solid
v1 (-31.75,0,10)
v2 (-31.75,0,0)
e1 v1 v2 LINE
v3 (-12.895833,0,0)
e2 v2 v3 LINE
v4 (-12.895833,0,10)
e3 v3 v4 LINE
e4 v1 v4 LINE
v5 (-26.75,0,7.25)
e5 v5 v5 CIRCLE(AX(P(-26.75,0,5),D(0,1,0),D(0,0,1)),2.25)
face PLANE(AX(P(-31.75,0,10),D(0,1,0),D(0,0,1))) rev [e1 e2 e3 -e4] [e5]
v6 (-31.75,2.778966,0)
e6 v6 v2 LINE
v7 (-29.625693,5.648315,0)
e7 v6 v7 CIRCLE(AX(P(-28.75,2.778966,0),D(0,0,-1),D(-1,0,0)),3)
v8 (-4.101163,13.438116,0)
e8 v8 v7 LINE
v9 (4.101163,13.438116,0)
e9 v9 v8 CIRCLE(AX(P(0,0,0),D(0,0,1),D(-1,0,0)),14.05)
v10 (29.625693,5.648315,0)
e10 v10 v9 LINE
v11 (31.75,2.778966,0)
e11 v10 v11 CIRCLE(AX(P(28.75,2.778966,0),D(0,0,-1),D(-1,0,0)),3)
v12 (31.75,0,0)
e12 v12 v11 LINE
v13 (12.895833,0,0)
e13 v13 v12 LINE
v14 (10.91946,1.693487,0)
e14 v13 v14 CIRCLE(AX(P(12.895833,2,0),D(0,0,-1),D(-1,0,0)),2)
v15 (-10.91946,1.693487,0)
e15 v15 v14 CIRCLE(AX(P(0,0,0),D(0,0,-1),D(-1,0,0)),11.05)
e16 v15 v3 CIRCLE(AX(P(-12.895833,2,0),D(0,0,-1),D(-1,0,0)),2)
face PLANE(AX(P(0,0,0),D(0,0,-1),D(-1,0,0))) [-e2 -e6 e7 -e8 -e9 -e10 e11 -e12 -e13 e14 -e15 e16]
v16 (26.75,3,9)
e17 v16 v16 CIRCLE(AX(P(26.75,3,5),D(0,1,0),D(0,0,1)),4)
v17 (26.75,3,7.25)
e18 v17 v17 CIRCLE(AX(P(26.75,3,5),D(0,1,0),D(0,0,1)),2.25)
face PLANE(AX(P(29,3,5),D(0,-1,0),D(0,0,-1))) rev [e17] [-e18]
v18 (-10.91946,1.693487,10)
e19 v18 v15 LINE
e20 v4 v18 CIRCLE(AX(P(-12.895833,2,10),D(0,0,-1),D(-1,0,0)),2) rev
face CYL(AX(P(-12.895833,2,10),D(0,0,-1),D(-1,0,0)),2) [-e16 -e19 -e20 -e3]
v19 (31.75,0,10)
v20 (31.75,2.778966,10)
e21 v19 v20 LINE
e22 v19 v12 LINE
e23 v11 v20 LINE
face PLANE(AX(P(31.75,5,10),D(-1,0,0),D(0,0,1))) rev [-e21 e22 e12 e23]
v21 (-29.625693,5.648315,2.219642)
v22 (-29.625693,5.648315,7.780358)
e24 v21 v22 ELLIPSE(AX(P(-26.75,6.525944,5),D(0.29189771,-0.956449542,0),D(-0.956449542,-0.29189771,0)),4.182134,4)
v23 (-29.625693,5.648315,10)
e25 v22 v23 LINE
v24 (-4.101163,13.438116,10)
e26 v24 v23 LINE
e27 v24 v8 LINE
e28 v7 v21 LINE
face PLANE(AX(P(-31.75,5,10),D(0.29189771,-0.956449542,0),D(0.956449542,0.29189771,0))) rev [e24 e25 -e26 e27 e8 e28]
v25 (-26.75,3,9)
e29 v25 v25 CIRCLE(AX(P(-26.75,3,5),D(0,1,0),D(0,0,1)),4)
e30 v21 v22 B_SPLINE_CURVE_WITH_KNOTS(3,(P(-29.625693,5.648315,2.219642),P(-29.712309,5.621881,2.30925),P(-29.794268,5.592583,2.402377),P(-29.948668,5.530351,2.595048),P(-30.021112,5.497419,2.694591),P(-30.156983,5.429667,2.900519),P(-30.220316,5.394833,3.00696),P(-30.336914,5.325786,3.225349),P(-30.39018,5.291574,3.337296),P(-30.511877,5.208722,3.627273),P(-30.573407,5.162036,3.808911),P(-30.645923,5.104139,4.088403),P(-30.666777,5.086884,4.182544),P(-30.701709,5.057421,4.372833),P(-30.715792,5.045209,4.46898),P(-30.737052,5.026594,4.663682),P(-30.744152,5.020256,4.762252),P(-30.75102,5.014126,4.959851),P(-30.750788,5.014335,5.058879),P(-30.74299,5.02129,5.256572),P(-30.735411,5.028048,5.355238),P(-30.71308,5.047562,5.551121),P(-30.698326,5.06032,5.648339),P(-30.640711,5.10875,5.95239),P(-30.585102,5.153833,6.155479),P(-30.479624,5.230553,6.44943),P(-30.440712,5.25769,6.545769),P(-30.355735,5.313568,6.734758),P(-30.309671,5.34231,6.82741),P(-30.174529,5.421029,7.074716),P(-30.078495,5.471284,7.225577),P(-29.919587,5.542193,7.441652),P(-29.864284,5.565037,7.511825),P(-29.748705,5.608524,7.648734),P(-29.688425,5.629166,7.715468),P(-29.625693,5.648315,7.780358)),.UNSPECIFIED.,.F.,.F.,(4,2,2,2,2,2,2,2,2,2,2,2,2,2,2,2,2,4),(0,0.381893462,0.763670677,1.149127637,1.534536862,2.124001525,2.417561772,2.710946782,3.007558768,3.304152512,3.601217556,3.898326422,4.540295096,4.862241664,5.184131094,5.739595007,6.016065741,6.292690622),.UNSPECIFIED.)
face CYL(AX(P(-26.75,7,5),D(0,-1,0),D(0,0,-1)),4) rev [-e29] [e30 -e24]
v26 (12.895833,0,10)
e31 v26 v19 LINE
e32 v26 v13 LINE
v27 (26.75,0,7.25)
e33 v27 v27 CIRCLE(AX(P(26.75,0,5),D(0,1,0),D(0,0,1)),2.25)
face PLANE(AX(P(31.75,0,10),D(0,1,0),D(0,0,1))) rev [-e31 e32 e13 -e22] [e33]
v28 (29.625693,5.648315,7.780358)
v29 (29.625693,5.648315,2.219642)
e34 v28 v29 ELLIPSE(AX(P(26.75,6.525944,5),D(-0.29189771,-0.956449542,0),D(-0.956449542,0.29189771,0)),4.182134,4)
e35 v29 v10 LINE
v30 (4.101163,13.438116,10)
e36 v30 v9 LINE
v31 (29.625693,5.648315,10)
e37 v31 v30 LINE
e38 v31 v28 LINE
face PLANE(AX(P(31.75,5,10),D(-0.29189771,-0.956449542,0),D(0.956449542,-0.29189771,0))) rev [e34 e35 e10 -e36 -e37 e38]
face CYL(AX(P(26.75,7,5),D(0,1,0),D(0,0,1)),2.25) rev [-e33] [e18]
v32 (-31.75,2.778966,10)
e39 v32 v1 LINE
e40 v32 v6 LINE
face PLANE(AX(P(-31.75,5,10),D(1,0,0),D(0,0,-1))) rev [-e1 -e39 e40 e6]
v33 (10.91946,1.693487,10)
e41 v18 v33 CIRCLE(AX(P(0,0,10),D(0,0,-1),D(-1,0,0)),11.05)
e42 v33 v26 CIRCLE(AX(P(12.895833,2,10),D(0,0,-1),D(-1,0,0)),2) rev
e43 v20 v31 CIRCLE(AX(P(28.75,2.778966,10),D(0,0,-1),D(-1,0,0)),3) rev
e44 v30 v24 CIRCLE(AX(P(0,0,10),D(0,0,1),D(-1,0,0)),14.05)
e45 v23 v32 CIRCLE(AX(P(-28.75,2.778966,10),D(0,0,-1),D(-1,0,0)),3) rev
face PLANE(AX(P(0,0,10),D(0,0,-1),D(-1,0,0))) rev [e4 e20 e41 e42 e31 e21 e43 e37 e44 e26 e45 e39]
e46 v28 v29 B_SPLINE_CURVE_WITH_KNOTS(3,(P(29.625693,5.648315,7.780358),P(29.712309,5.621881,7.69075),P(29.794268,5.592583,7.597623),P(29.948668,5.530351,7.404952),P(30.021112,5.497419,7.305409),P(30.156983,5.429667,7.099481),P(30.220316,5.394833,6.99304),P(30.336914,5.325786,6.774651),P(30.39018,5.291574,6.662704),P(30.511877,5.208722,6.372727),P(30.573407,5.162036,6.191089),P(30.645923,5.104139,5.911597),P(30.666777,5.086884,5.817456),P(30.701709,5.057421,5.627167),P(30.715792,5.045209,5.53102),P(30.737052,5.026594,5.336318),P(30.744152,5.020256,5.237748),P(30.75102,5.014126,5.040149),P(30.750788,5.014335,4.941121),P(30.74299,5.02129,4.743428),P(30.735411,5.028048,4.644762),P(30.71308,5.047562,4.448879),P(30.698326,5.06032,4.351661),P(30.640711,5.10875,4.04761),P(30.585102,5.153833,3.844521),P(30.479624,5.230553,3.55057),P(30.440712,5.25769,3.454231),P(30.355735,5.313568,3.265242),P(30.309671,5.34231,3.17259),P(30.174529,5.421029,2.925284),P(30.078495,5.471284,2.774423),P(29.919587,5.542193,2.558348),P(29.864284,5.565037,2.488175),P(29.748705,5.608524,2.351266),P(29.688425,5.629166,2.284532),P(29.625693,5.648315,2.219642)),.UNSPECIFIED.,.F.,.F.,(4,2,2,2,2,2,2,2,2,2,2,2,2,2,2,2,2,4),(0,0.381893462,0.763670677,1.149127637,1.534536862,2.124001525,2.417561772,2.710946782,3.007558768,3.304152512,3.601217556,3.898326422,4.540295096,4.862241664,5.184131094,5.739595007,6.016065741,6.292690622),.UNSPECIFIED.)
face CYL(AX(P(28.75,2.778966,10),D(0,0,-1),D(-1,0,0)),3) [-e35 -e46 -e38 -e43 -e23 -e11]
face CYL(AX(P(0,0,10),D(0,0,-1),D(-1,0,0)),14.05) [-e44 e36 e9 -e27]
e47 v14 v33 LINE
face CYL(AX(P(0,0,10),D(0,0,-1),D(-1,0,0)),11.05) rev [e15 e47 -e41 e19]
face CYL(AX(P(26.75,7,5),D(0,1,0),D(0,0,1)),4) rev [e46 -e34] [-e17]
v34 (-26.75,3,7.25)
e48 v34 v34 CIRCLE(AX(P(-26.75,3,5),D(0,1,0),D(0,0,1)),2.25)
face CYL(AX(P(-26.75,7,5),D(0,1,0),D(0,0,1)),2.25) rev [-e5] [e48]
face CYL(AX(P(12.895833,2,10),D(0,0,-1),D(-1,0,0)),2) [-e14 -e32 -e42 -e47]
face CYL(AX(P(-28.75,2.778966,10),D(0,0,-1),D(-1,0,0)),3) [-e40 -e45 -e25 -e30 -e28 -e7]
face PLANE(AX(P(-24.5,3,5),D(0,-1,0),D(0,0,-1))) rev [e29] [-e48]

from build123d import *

# Parameters (mm, degrees)
EXTRUDE_1_DEPTH             = 10
HOLE_WIZARD_M43_D           = 4.5
HOLE_WIZARD_M43_CBORE_D     = 8
HOLE_WIZARD_M43_CBORE_DEPTH = 4
FILLET_4_R                  = 2
FILLET_2_R                  = 3


with BuildPart() as part:
    # Эскиз1 → Бобышка-Вытянуть1 (new body)
    with BuildSketch(Plane.XY):
        with BuildLine():
            Line((-31.75, 5), (-4.101162824, 13.438116069))
            ThreePointArc((-4.101162824, 13.438116069), (0, 14.05), (4.101162824, 13.438116069))
            Line((4.101162824, 13.438116069), (31.75, 5))
            Line((31.75, 5), (31.75, 0))
            Line((31.75, 0), (11.05, 0))
            ThreePointArc((11.05, 0), (0, 11.05), (-11.05, 0))
            Line((-11.05, 0), (-31.75, 0))
            Line((-31.75, 0), (-31.75, 5))
        make_face()
    extrude(amount=EXTRUDE_1_DEPTH)

    # Эскиз5 → Цековка для винта с внутренним шестигранником M42 (revolve, cut)
    with BuildSketch(Plane(origin=(-26.75, 7, 5), x_dir=(0, 0, -1), z_dir=(1, 0, 0))):
        Polygon((0, 0), (0, 7.05), (2.25, 7.05), (2.25, 4), (4, 4), (4, 0), align=None)
    revolve(axis=Axis((-26.75, 0.65, 5), (0, 1, 0)), mode=Mode.SUBTRACT)

    # Цековка для винта с внутренним шестигранником M43 (through all)
    with Locations(Plane(origin=(0, 7, 0), x_dir=(1, 0, 0), z_dir=(0, 1, 0))):
        with Locations((-26.75, -5)):
            CounterBoreHole(HOLE_WIZARD_M43_D / 2, HOLE_WIZARD_M43_CBORE_D / 2, HOLE_WIZARD_M43_CBORE_DEPTH)

    # Эскиз10 → Цековка для винта с внутренним шестигранником M44 (revolve, cut)
    with BuildSketch(Plane(origin=(26.75, 7, 5), x_dir=(0, 0, 1), z_dir=(1, 0, 0))):
        Polygon((0, 0), (0, 7), (2.25, 7), (2.25, 4), (4, 4), (4, 0), align=None)
    revolve(axis=Axis((26.75, 13.35, 5), (0, -1, 0)), mode=Mode.SUBTRACT)

    # Эскиз12 → Цековка для винта с внутренним шестигранником M45 (revolve, cut)
    with BuildSketch(Plane(origin=(26.75, 7, 5), x_dir=(0, 0, -1), z_dir=(1, 0, 0))):
        Polygon((0, 0), (0, 7.05), (2.25, 7.05), (2.25, 4), (4, 4), (4, 0), align=None)
    revolve(axis=Axis((26.75, 0.65, 5), (0, 1, 0)), mode=Mode.SUBTRACT)

    # Скругление4
    fillet_4_edges = [part.edges().sort_by_distance(p)[0] for p in [
        (-11.05, 0, 5),
        (11.05, 0, 5),
    ]]
    fillet(fillet_4_edges, radius=FILLET_4_R)

    # Скругление2
    # the kernel refuses this fillet: 3 mm, written as the material it takes off along each edge
    with BuildSketch(Plane(origin=(-31.75, 5, -5.552584785), x_dir=(0, -1, 0), z_dir=(0, 0, 1)), Plane(origin=(31.75, 5, -5.552584785), x_dir=(-0.95644954230243, 0.2918977098736336, 0), z_dir=(0, 0, 1))) as fillet_2_piece_1:
        with BuildLine():
            CenterArc((FILLET_2_R * 0.740344637964, FILLET_2_R), FILLET_2_R, 196.971603354, 73.028396646)
            Line((-FILLET_2_R * 0.216104904339, FILLET_2_R * 0.708102290126), (0, 0))
            Line((0, 0), (FILLET_2_R * 0.740344637964, 0))
        make_face()
    extrude(amount=21.105169569, mode=Mode.SUBTRACT)


solid = part.part
